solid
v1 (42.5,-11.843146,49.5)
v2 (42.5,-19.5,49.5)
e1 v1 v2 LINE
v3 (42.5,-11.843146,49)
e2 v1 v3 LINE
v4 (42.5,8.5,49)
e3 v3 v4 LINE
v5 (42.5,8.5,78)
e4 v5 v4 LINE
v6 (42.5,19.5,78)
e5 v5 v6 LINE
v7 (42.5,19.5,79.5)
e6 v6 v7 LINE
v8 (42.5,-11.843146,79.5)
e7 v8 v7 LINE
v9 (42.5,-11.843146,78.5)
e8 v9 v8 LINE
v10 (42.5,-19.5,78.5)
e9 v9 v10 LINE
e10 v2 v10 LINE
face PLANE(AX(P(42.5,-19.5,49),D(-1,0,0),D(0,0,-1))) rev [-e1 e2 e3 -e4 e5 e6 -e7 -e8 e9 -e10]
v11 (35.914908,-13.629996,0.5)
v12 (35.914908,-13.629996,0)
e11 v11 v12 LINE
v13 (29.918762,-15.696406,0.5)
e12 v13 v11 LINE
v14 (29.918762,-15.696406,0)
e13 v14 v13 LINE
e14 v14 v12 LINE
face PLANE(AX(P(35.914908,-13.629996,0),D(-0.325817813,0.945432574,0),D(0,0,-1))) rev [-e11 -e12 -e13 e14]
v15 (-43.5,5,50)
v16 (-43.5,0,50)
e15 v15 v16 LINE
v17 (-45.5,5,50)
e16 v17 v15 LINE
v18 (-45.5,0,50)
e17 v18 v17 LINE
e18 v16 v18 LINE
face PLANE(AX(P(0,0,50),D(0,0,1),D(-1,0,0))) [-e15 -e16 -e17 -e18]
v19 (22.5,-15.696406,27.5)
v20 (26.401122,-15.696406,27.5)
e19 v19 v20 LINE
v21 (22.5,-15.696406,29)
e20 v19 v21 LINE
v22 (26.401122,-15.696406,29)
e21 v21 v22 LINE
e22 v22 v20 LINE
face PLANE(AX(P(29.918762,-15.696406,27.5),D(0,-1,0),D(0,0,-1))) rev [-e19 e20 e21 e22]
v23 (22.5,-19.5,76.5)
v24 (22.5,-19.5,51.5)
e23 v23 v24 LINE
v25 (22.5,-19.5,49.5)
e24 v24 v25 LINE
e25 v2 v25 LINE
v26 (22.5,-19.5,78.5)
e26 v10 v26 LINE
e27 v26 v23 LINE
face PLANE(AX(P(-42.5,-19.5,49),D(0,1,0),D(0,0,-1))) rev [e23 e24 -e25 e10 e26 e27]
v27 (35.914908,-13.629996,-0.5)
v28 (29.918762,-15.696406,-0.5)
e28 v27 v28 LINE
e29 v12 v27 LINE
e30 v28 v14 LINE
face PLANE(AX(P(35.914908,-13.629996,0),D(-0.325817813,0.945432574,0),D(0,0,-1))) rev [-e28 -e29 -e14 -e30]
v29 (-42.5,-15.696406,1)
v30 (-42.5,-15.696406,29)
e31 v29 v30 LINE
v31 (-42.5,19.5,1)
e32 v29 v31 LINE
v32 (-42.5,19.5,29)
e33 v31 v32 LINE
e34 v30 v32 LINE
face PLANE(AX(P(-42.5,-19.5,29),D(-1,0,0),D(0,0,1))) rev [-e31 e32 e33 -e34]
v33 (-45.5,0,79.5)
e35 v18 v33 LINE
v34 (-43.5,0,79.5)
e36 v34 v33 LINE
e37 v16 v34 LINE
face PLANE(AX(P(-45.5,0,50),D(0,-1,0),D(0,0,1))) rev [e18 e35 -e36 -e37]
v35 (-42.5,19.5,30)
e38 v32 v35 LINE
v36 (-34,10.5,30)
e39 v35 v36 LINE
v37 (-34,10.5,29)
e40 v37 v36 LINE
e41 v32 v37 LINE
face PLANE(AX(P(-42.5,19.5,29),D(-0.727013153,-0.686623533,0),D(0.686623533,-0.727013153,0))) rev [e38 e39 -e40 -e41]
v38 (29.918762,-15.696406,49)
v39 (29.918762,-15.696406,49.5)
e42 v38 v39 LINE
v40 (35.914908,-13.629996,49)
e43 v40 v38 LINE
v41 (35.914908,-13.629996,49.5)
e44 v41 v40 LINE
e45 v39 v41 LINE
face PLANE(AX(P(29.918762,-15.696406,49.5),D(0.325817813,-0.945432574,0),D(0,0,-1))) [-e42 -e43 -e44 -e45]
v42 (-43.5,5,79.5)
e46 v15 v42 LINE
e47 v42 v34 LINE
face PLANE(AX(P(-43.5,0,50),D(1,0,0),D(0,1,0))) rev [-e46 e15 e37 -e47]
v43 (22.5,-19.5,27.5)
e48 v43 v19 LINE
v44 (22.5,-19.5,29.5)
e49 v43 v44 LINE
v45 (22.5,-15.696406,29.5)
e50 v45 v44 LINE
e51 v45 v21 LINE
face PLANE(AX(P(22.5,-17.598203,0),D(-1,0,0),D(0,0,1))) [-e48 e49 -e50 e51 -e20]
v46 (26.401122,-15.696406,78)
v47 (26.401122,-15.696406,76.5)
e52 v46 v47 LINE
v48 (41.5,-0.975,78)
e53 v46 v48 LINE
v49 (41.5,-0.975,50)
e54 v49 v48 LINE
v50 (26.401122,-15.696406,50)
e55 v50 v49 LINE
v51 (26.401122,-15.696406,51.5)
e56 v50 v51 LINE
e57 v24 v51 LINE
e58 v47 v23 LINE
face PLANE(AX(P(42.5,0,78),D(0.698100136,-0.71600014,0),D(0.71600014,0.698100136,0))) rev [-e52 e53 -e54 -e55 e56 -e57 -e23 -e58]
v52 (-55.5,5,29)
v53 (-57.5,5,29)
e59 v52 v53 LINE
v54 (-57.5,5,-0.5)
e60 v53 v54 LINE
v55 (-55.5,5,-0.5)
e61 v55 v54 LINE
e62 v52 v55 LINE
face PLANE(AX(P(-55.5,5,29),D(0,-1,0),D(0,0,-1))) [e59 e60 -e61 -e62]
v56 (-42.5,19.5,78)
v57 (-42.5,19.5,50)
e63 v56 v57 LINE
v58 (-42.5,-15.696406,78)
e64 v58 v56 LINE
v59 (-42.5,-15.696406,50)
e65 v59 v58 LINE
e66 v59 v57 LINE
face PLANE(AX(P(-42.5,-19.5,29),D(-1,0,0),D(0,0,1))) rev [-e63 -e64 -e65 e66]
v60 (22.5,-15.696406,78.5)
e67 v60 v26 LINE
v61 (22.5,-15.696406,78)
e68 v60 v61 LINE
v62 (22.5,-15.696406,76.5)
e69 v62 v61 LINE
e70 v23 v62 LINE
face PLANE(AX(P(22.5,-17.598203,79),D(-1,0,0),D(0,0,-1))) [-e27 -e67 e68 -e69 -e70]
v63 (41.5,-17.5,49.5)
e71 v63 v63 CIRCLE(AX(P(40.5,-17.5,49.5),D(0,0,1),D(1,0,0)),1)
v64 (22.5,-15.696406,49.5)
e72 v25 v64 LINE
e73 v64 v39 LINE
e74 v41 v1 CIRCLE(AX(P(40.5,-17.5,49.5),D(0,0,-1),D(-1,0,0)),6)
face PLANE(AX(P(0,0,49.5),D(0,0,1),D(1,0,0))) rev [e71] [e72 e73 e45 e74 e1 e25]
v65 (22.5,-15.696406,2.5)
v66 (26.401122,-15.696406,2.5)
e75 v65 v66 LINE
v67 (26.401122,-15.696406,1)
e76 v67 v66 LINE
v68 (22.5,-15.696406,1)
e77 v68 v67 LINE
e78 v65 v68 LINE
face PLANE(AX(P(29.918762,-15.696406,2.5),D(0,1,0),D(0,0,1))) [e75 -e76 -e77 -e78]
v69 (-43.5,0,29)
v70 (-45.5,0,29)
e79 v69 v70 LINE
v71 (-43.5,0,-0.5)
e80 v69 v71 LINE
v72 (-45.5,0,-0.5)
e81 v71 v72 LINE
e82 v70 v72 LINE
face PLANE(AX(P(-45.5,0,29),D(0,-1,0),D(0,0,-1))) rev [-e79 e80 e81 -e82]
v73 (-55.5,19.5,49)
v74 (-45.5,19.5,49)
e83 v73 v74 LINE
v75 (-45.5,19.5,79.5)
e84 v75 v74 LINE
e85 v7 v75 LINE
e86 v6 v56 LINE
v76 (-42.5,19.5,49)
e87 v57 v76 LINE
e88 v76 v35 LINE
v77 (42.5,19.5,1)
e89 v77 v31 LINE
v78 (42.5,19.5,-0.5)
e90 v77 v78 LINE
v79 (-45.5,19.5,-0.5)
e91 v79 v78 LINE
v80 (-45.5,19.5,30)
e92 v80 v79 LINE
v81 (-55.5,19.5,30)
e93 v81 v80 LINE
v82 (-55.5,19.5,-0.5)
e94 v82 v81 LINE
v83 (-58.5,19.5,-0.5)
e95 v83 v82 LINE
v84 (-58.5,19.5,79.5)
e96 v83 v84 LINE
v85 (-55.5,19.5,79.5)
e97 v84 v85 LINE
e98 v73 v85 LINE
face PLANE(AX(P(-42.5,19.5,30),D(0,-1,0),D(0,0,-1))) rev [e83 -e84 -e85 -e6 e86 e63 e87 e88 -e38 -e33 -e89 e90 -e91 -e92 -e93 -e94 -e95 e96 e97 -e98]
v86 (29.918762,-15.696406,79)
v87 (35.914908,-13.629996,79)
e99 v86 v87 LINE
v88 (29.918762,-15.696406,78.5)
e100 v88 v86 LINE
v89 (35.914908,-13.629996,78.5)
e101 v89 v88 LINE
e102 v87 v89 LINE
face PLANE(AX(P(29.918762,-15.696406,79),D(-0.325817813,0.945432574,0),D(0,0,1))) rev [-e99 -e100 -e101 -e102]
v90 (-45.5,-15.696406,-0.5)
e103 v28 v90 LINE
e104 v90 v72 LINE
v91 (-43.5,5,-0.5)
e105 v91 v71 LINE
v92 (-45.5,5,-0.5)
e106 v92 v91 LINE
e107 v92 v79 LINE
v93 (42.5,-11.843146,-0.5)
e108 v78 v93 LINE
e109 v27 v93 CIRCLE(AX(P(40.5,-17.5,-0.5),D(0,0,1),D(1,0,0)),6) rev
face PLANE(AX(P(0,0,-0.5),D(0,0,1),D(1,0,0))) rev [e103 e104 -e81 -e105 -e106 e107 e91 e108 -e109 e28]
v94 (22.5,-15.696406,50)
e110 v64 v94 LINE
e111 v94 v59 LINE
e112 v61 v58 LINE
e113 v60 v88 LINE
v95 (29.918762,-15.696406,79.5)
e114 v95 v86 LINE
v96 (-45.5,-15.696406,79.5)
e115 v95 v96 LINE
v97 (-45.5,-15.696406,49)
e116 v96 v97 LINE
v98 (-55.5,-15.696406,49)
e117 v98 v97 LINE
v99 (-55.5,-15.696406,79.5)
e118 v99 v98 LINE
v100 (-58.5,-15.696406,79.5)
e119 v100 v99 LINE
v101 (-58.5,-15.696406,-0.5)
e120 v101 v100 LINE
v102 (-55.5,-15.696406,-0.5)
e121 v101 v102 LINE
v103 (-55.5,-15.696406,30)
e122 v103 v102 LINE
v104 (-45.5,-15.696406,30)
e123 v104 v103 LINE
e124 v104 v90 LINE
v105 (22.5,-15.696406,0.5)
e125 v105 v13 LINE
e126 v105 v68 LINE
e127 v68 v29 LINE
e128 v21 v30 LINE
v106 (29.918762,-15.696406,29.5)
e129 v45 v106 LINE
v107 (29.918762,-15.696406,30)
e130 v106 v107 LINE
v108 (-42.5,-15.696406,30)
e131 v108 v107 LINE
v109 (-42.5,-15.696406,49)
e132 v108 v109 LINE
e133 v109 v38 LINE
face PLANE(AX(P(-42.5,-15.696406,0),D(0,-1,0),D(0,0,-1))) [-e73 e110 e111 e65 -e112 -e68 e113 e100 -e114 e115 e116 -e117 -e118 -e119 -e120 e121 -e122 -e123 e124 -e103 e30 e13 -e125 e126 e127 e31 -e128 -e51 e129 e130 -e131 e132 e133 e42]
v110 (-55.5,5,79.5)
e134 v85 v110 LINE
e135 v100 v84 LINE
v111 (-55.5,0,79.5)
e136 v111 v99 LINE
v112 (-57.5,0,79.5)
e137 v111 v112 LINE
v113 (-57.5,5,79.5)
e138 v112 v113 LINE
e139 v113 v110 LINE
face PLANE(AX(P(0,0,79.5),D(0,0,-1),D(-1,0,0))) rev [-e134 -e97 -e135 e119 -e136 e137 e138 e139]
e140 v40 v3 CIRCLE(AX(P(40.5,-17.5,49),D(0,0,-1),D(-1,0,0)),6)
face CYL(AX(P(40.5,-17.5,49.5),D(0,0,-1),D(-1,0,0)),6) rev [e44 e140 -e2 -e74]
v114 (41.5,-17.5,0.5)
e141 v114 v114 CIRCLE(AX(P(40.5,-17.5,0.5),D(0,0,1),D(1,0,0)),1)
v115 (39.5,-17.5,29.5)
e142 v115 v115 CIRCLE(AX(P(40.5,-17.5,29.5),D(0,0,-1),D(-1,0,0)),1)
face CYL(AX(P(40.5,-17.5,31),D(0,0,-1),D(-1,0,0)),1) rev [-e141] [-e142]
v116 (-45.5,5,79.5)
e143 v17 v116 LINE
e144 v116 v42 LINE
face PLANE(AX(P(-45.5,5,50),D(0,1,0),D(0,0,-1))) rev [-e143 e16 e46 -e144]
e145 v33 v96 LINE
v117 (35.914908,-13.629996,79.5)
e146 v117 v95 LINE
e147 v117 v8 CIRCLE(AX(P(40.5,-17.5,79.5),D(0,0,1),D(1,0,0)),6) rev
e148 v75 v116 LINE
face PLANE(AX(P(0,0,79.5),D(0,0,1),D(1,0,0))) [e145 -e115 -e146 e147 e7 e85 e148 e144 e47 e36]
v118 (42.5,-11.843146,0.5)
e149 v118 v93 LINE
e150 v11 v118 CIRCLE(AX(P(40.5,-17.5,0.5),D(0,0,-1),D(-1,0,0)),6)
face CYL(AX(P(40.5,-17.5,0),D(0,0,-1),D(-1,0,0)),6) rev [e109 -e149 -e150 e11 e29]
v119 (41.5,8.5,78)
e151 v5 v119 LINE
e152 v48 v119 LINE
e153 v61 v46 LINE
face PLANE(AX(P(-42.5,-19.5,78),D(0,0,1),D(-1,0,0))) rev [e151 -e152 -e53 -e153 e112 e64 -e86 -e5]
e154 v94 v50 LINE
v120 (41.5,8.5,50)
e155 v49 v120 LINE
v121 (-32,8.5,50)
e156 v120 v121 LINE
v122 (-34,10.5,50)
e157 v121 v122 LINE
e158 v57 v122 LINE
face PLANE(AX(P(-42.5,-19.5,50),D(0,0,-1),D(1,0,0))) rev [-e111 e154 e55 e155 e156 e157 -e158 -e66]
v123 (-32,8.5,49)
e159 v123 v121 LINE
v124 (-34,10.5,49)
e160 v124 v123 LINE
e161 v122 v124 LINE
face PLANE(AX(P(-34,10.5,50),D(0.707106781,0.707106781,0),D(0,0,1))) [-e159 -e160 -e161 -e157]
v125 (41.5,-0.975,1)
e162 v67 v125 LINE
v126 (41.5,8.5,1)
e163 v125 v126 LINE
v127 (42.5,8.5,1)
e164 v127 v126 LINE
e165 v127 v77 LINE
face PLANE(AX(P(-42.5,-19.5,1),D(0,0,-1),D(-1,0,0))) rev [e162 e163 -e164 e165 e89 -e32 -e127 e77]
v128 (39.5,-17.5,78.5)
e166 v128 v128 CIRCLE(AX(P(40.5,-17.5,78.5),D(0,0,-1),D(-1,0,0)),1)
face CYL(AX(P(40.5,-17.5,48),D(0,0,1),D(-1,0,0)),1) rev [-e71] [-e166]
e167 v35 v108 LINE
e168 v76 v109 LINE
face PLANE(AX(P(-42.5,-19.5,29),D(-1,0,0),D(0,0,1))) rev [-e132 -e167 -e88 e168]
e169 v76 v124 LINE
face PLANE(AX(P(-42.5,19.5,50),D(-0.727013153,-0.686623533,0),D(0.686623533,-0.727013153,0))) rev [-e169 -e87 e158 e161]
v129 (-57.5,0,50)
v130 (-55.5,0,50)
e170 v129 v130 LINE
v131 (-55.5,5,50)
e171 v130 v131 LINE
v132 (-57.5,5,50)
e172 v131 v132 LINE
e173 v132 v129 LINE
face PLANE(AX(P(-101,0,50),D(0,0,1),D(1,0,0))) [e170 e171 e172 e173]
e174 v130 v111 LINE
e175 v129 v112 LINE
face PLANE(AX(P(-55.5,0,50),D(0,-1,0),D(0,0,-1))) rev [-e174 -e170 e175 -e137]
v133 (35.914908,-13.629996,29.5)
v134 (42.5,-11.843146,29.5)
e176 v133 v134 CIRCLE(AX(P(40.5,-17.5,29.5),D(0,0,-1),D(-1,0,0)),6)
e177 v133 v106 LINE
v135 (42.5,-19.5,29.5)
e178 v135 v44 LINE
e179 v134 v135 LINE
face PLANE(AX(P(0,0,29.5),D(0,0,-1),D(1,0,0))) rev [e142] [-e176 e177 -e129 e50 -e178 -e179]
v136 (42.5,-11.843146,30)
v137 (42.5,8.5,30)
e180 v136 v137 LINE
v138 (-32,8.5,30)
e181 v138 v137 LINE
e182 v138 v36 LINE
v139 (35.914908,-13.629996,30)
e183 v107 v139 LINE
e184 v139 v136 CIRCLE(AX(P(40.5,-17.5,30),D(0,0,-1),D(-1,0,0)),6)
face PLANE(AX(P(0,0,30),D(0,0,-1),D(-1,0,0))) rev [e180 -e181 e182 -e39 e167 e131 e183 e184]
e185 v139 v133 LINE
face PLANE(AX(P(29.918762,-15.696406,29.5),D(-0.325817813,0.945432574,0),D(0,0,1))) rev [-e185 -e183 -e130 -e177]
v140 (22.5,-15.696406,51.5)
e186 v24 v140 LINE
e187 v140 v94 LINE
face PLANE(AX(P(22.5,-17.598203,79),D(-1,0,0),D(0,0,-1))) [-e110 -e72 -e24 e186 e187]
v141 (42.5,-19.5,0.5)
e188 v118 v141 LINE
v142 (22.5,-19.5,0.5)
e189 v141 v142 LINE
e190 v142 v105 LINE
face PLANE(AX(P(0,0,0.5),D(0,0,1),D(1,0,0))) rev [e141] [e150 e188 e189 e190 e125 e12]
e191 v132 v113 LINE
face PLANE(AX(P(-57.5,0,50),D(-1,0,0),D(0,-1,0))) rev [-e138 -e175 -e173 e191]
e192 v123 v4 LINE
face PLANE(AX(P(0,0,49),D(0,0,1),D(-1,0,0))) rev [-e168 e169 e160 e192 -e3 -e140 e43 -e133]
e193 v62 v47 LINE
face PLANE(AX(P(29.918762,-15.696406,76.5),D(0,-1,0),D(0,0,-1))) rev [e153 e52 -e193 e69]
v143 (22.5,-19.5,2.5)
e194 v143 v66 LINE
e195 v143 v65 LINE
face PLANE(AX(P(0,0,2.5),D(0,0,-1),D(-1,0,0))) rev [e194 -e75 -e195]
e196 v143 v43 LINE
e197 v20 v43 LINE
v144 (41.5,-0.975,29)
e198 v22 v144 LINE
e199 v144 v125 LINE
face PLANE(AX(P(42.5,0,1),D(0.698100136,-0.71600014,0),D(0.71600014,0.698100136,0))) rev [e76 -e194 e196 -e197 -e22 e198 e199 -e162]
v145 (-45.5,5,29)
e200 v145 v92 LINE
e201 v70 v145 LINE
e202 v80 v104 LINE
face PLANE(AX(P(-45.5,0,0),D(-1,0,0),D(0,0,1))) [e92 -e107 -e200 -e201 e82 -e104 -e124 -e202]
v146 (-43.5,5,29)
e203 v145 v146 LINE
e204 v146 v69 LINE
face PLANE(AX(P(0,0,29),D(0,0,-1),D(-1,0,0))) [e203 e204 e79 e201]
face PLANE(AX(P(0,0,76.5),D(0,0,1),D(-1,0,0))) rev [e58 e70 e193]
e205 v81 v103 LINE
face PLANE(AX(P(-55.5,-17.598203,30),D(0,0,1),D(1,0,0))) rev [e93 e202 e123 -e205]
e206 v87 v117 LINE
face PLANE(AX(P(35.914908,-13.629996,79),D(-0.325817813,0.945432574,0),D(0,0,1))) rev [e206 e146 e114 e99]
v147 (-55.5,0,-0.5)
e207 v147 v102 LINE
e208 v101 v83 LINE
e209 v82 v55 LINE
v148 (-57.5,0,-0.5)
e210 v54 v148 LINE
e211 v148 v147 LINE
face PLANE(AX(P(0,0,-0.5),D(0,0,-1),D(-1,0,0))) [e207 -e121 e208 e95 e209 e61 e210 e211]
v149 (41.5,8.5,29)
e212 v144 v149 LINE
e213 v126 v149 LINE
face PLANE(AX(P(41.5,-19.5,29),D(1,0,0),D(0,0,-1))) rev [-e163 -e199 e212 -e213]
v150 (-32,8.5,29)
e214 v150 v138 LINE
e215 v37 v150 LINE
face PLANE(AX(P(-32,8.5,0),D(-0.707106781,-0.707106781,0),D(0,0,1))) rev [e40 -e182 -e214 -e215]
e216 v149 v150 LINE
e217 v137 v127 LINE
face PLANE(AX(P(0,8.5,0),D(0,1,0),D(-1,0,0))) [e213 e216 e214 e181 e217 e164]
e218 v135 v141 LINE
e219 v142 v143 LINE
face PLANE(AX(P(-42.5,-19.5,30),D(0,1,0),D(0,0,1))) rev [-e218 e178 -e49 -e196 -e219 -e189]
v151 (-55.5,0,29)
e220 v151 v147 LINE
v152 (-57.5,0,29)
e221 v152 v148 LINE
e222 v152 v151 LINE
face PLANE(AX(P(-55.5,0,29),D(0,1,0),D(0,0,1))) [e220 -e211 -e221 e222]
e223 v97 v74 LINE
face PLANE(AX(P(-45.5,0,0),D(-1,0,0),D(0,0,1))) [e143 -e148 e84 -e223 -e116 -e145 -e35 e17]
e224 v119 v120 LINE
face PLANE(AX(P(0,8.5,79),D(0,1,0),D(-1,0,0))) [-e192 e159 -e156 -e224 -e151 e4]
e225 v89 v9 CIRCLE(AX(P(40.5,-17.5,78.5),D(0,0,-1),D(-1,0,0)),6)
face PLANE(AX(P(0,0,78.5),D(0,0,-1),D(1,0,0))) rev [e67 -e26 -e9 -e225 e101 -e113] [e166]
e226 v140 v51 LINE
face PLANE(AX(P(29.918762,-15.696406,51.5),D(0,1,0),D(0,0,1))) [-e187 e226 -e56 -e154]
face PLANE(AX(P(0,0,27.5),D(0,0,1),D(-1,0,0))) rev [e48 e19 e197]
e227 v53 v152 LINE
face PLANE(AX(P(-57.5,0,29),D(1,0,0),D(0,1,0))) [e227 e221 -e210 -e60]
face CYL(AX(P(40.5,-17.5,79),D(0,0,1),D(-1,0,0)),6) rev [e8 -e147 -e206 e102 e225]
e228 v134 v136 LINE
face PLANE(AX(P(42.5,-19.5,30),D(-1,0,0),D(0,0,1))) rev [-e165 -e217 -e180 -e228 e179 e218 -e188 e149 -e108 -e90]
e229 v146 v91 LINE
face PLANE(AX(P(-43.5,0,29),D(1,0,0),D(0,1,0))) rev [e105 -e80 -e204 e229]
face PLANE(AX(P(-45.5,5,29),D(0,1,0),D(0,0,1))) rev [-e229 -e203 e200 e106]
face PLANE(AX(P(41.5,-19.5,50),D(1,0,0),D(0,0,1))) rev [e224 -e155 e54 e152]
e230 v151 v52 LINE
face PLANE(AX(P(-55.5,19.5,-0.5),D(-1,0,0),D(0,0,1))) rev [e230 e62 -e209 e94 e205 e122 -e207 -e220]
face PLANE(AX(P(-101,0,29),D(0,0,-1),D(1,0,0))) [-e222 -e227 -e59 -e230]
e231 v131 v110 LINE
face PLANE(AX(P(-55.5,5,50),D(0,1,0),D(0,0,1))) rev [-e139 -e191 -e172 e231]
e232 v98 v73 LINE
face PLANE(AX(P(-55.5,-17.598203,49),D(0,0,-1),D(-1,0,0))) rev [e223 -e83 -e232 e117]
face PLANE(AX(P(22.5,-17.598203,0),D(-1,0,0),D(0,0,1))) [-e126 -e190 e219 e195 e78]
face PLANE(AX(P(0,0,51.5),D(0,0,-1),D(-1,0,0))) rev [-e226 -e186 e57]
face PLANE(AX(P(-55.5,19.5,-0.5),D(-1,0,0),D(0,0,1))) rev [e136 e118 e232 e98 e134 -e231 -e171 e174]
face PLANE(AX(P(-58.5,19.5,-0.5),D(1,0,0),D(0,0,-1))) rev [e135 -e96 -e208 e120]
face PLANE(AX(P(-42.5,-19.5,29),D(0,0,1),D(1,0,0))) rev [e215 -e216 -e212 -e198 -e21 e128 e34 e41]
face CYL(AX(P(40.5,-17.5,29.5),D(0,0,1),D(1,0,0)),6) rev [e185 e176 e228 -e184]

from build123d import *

# Parameters (mm, degrees)
SKETCH4_W                 = 85
SKETCH4_H                 = 39
BOSS_EXTRUDE2_DEPTH       = 30
BOSS_EXTRUDE3_DEPTH       = 39
SKETCH7_W                 = 84
SKETCH7_H                 = 28
CUT_EXTRUDE1_DEPTH        = 39
CUT_EXTRUDE2_DEPTH        = 1
SKETCH9_W                 = 1
SKETCH9_H                 = 9
CUT_EXTRUDE4_DEPTH        = 28
SKETCH19_W                = 31
SKETCH19_H                = 39
BOSS_EXTRUDE4_DEPTH       = 2
SKETCH20_W                = 3
SKETCH20_H                = 39
BOSS_EXTRUDE5_DEPTH       = 9
SKETCH38_W                = 1
SKETCH38_H                = 29
BOSS_EXTRUDE6_DEPTH       = 9
SKETCH39_W                = 1
SKETCH39_H                = 39
BOSS_EXTRUDE7_DEPTH       = 47.410129
BOSS_EXTRUDE8_DEPTH       = 28
SKETCH42_W                = 2
SKETCH42_H                = 5
CUT_EXTRUDE5_DEPTH        = 30
BOSS_EXTRUDE9_DEPTH       = 1
SKETCH44_R                = 1
CUT_EXTRUDE7_DEPTH        = 32
SKETCH46_W                = 85
SKETCH46_H                = 3.803593904
CUT_EXTRUDE8_DEPTH        = 1
CUT_EXTRUDE9_START        = -1
SKETCH48_W                = 65
SKETCH48_H                = 1.901796952
CUT_EXTRUDE9_DEPTH        = 30
SKETCH49_R                = 6
CUT_EXTRUDE10_DEPTH       = 1
CUT_EXTRUDE11_START       = -3
SKETCH50_W                = 31
SKETCH50_H                = 1.901796952
CUT_EXTRUDE11_DEPTH       = 3
SKETCH52_W                = 3
SKETCH52_H                = 39
BOSS_EXTRUDE10_DEPTH      = 0.5
CUT_EXTRUDE13_START       = -85
SKETCH56_W                = 1
SKETCH56_H                = 35.196406096
CUT_EXTRUDE13_DEPTH       = 85
SKETCH58_W                = 88
SKETCH58_H                = 39
CUT_EXTRUDE14_DEPTH       = 0.5
SKETCH59_W                = 88
SKETCH59_H                = 39
CUT_EXTRUDE15_DEPTH       = 0.5
SKETCH60_W                = 19
SKETCH60_H                = 37.098203048
BOSS_EXTRUDE11_DEPTH      = 10
BOSS_EXTRUDE12_DEPTH      = 30.5
BOSS_EXTRUDE12_DEPTH_BACK = 49.5
SKETCH61_W                = 3
SKETCH61_H                = 37.098203048
MIRROR13_COPY_1_SKETCH_W  = 2
MIRROR13_COPY_1_SKETCH_H  = 5
MIRROR13_COPY_1_DEPTH     = 30
MIRROR13_COPY_2_SKETCH_W  = 2
MIRROR13_COPY_2_SKETCH_H  = 5
MIRROR13_COPY_2_DEPTH     = 30
SKETCH63_W                = 85
SKETCH63_H                = 3.803593904
CUT_EXTRUDE16_DEPTH       = 0.5
MIRROR15_COPY_1_SKETCH_W  = 85
MIRROR15_COPY_1_SKETCH_H  = 3.803593904
MIRROR15_COPY_1_DEPTH     = 0.5
SKETCH66_R                = 6
CUT_EXTRUDE17_DEPTH       = 0.5
MIRROR17_COPY_1_SKETCH_R  = 6
MIRROR17_COPY_1_DEPTH     = 0.5
CHAMFER3_START            = 24.587959213
CHAMFER3_OUTLINE_W        = 9
CHAMFER3_OUTLINE_H        = 0.5
CHAMFER3_DEPTH            = 7.695233043
SKETCH67_W                = 3
SKETCH67_H                = 19
CUT_EXTRUDE18_DEPTH       = 1.901797
SKETCH72_W                = 65
SKETCH72_H                = 0.5
CUT_EXTRUDE21_DEPTH       = 1.901797
MIRROR20_COPY_1_SKETCH_W  = 65
MIRROR20_COPY_1_SKETCH_H  = 0.5
MIRROR20_COPY_1_DEPTH     = 1.901797
SKETCH74_W                = 7.418761949
SKETCH74_H                = 3.803593904
BOSS_EXTRUDE13_DEPTH      = 2
MIRROR22_COPY_1_SKETCH_W  = 7.418761949
MIRROR22_COPY_1_SKETCH_H  = 3.803593904
MIRROR22_COPY_1_DEPTH     = 2
CUT_EXTRUDE31_START       = -16
SKETCH79_W                = 80
SKETCH79_H                = 1.901796952
CUT_EXTRUDE31_DEPTH       = 16
SKETCH81_W                = 94
SKETCH81_H                = 1
CUT_EXTRUDE33_DEPTH       = 2
CUT_EXTRUDE34_START       = -11
SKETCH80_W                = 1
SKETCH80_H                = 29
CUT_EXTRUDE34_DEPTH       = 11
CHAMFER5_SIZE             = 2
CHAMFER5_OF_MIRROR23_SIZE = 2


with BuildPart() as part:
    # Sketch4 → Boss-Extrude2 (new body)
    with BuildSketch(Plane.XY):
        Rectangle(SKETCH4_W, SKETCH4_H)
    extrude(amount=BOSS_EXTRUDE2_DEPTH)

    # Sketch6 → Boss-Extrude3 (add)
    with BuildSketch(Plane(origin=(0, 19.5, 0), x_dir=(1, 0, 0), z_dir=(0, 1, 0))):
        Polygon((-4.910129242, 0), (-4.910129242, 1), (-43.5, 1), (-43.5, -30), (-42.5, -30), (-42.5, 0), align=None)
    extrude(amount=-BOSS_EXTRUDE3_DEPTH)

    # Sketch7 → Cut-Extrude1 (cut)
    with BuildSketch(Plane(origin=(0, 19.5, 0), x_dir=(1, 0, 0), z_dir=(0, 1, 0))):
        with Locations((-0.5, -15)):
            Rectangle(SKETCH7_W, SKETCH7_H)
    extrude(amount=-CUT_EXTRUDE1_DEPTH, mode=Mode.SUBTRACT)

    # Angled cut → Cut-Extrude2 (cut)
    with BuildSketch(Plane.XY.offset(30)):
        Polygon((12.07, 10.5), (42.5, 10.5), (42.5, 19.5), (-42.5, 19.5), (-34, 10.5), align=None)
    extrude(amount=-CUT_EXTRUDE2_DEPTH, mode=Mode.SUBTRACT)

    # Sketch9 → Cut-Extrude4 (cut)
    with BuildSketch(Plane.XY.offset(29)):
        with Locations((42, 15)):
            Rectangle(SKETCH9_W, SKETCH9_H)
    extrude(amount=-CUT_EXTRUDE4_DEPTH, mode=Mode.SUBTRACT)

    # Sketch19 → Boss-Extrude4 (add)
    with BuildSketch(Plane.ZY.offset(43.5)):
        with Locations((14.5, 0)):
            Rectangle(SKETCH19_W, SKETCH19_H)
    extrude(amount=BOSS_EXTRUDE4_DEPTH)

    # Sketch20 → Boss-Extrude5 (add)
    with BuildSketch(Plane.XY.offset(30)):
        with Locations((-44, 0)):
            Rectangle(SKETCH20_W, SKETCH20_H)
    extrude(amount=BOSS_EXTRUDE5_DEPTH)

    # Sketch38 → Boss-Extrude6 (add)
    with BuildSketch(Plane(origin=(0, 10.5, 0), x_dir=(1, 0, 0), z_dir=(0, 1, 0))):
        with Locations((42, -15.5)):
            Rectangle(SKETCH38_W, SKETCH38_H)
    extrude(amount=BOSS_EXTRUDE6_DEPTH)

    # Sketch39 → Boss-Extrude7 (add)
    with BuildSketch(Plane(origin=(-4.910129242, 0, 0), x_dir=(0, 0, -1), z_dir=(1, 0, 0))):
        with Locations((0.5, 0)):
            Rectangle(SKETCH39_W, SKETCH39_H)
    extrude(amount=BOSS_EXTRUDE7_DEPTH)

    # Sketch40 → Boss-Extrude8 (add)
    with BuildSketch(Plane(origin=(0, 0, 29), x_dir=(-1, 0, 0), z_dir=(0, 0, -1))):
        Polygon((-42.5, -19.5), (-42.5, 0), (-22.5, -19.5), align=None)
    extrude(amount=BOSS_EXTRUDE8_DEPTH)

    # Sketch42 → Cut-Extrude5 (cut)
    with BuildSketch(Plane(origin=(0, 0, -1), x_dir=(-1, 0, 0), z_dir=(0, 0, -1))):
        with Locations((44.5, 2.5)):
            Rectangle(SKETCH42_W, SKETCH42_H)
    cut_extrude5 = extrude(amount=-CUT_EXTRUDE5_DEPTH, mode=Mode.SUBTRACT)

    # Sketch45 → Boss-Extrude9 (add)
    with BuildSketch(Plane.XY.offset(30)):
        Polygon((-42.5, 19.5), (-42.5, -19.5), (42.5, -19.5), (42.5, 19.5), (41.5, 19.5), (41.5, 10.5), (-34, 10.5), align=None)
    extrude(amount=BOSS_EXTRUDE9_DEPTH)

    # Sketch44 → Cut-Extrude7 (cut)
    with BuildSketch(Plane.XY.offset(-1)):
        with Locations((40.5, -17.5)):
            Circle(SKETCH44_R)
    extrude(amount=CUT_EXTRUDE7_DEPTH, mode=Mode.SUBTRACT)

    # Sketch46 → Cut-Extrude8 (cut)
    with BuildSketch(Plane.XY.offset(31)):
        with Locations((0, -17.598203048)):
            Rectangle(SKETCH46_W, SKETCH46_H)
    cut_extrude8 = extrude(amount=-CUT_EXTRUDE8_DEPTH, mode=Mode.SUBTRACT)

    # Mirror1: Cut-Extrude8 across plane
    add(cut_extrude8.mirror(Plane.XY.offset(15)), mode=Mode.SUBTRACT)

    # Sketch48 → Cut-Extrude9 (cut)
    with BuildSketch(Plane(origin=(0, 0, 29), x_dir=(-1, 0, 0), z_dir=(0, 0, -1)).offset(CUT_EXTRUDE9_START)):
        with Locations((10, -18.549101524)):
            Rectangle(SKETCH48_W, SKETCH48_H)
    extrude(amount=CUT_EXTRUDE9_DEPTH, mode=Mode.SUBTRACT)

    # Sketch49 → Cut-Extrude10 (cut)
    with BuildSketch(Plane(origin=(0, 0, -1), x_dir=(-1, 0, 0), z_dir=(0, 0, -1))):
        with Locations((-40.5, -17.5)):
            Circle(SKETCH49_R)
    cut_extrude10 = extrude(amount=-CUT_EXTRUDE10_DEPTH, mode=Mode.SUBTRACT)

    # Chamfer1
    # the kernel refuses this chamfer: 5.980598359, 5 mm, written as the material it takes off along each edge
    with BuildSketch(Plane(origin=(34.777496262, -15.696406096, 0), x_dir=(0.4822071205961933, 0.8760572429050103, 0), z_dir=(0, 0, -1))) as chamfer1_piece_1:
        with BuildLine():
            Line((2.536104825, 0.160553083), (-2.520260012, -4.417082469))
            Line((-2.520260012, -4.417082469), (-2.625046943, -4.359404727))
            ThreePointArc((-2.625046943, -4.359404727), (-1.330775488, -2.169655928), (-0.10478693, 0.057677742))
            Line((-0.10478693, 0.057677742), (0.023511338, 0.117278471))
            ThreePointArc((0.023511338, 0.117278471), (1.269229547, 0.003245098), (2.512593487, 0.277831553))
            Line((2.512593487, 0.277831553), (2.536104825, 0.160553083))
        make_face()
    extrude(amount=13.71375438, mode=Mode.SUBTRACT)

    # Mirror5: Cut-Extrude10 across plane
    add(cut_extrude10.mirror(Plane.XY.offset(15)), mode=Mode.SUBTRACT)

    # Chamfer2
    # the kernel refuses this chamfer: 5, 3.700015876 mm, written as the material it takes off along each edge
    with BuildSketch(Plane(origin=(34.777496262, -15.696406096, 30), x_dir=(-1, 0, 0), z_dir=(0, 0, 1))) as chamfer2_piece_1:
        with BuildLine():
            Line((4.531412713, 0.062382614), (-1.046280636, -1.768725655))
            Line((-1.046280636, -1.768725655), (-1.127384723, -1.710226706))
            ThreePointArc((-1.127384723, -1.710226706), (-0.481456561, -0.905912415), (-0.095375062, 0.030059898))
            Line((-0.095375062, 0.030059898), (0, 0.1))
            ThreePointArc((0, 0.1), (2.265706356, 0.1), (4.531412713, 0.162382614))
            Line((4.531412713, 0.162382614), (4.531412713, 0.062382614))
        make_face()
    extrude(amount=12.329605235, mode=Mode.SUBTRACT)

    # Sketch50 → Cut-Extrude11 (cut)
    with BuildSketch(Plane(origin=(-42.5, 0, 0), x_dir=(0, 0, -1), z_dir=(1, 0, 0)).offset(CUT_EXTRUDE11_START)):
        with Locations((-14.5, -18.549101524)):
            Rectangle(SKETCH50_W, SKETCH50_H)
    extrude(amount=CUT_EXTRUDE11_DEPTH, mode=Mode.SUBTRACT)

    # Sketch52 → Boss-Extrude10 (add)
    with BuildSketch(Plane.XY.offset(39)):
        with Locations((-44, 0)):
            Rectangle(SKETCH52_W, SKETCH52_H)
    extrude(amount=BOSS_EXTRUDE10_DEPTH)

    # Mirror8: part across plane


with BuildPart() as part_1:
    add(part.part)
    add(part.part.mirror(Plane.XY.offset(39.5)))

    # Sketch56 → Cut-Extrude13 (cut)
    with BuildSketch(Plane(origin=(42.5, 0, 0), x_dir=(0, 0, -1), z_dir=(1, 0, 0)).offset(CUT_EXTRUDE13_START)):
        with Locations((-30.5, 1.901796952)):
            Rectangle(SKETCH56_W, SKETCH56_H)
    cut_extrude13 = extrude(amount=CUT_EXTRUDE13_DEPTH, mode=Mode.SUBTRACT)

    # Mirror11: Cut-Extrude13 across plane
    add(cut_extrude13.mirror(Plane.XY.offset(39.5)), mode=Mode.SUBTRACT)

    # Sketch58 → Cut-Extrude14 (cut)
    with BuildSketch(Plane(origin=(0, 0, -1), x_dir=(-1, 0, 0), z_dir=(0, 0, -1))):
        with Locations((1.5, 0)):
            Rectangle(SKETCH58_W, SKETCH58_H)
    extrude(amount=-CUT_EXTRUDE14_DEPTH, mode=Mode.SUBTRACT)

    # Sketch59 → Cut-Extrude15 (cut)
    with BuildSketch(Plane.XY.offset(80)):
        with Locations((-1.5, 0)):
            Rectangle(SKETCH59_W, SKETCH59_H)
    extrude(amount=-CUT_EXTRUDE15_DEPTH, mode=Mode.SUBTRACT)

    # Sketch60 → Boss-Extrude11 (add)
    with BuildSketch(Plane.ZY.offset(45.5)):
        with Locations((39.5, 0.950898476)):
            Rectangle(SKETCH60_W, SKETCH60_H)
    extrude(amount=BOSS_EXTRUDE11_DEPTH)

    # Sketch61 → Boss-Extrude12 (add, two sides: drawn at the far end of the back side and taken through both)
    with BuildSketch(Plane(origin=(0, 0, 30), x_dir=(-1, 0, 0), z_dir=(0, 0, -1)).offset(-BOSS_EXTRUDE12_DEPTH_BACK)):
        with Locations((57, 0.950898476)):
            Rectangle(SKETCH61_W, SKETCH61_H)
    extrude(amount=BOSS_EXTRUDE12_DEPTH + BOSS_EXTRUDE12_DEPTH_BACK)

    # Mirror12: Cut-Extrude5 across plane
    add(cut_extrude5.mirror(Plane.ZY.offset(50.5)), mode=Mode.SUBTRACT)

    # Mirror13 copy 1 sketch → Mirror13 copy 1 (cut)
    with BuildSketch(Plane(origin=(-101, 0, 80), x_dir=(1, 0, 0), z_dir=(0, 0, 1))):
        with Locations((44.5, 2.5)):
            Rectangle(MIRROR13_COPY_1_SKETCH_W, MIRROR13_COPY_1_SKETCH_H)
    extrude(amount=-MIRROR13_COPY_1_DEPTH, mode=Mode.SUBTRACT)

    # Mirror13 copy 2 sketch → Mirror13 copy 2 (cut)
    with BuildSketch(Plane(origin=(0, 0, 80), x_dir=(-1, 0, 0), z_dir=(0, 0, 1))):
        with Locations((44.5, -2.5)):
            Rectangle(MIRROR13_COPY_2_SKETCH_W, MIRROR13_COPY_2_SKETCH_H)
    extrude(amount=-MIRROR13_COPY_2_DEPTH, mode=Mode.SUBTRACT)

    # Sketch63 → Cut-Extrude16 (cut)
    with BuildSketch(Plane(origin=(0, 0, 0), x_dir=(-1, 0, 0), z_dir=(0, 0, -1))):
        with Locations((0, -17.598203048)):
            Rectangle(SKETCH63_W, SKETCH63_H)
    cut_extrude16 = extrude(amount=-CUT_EXTRUDE16_DEPTH, mode=Mode.SUBTRACT)

    # Mirror14: Cut-Extrude16 across plane
    add(cut_extrude16.mirror(Plane.XY.offset(15)), mode=Mode.SUBTRACT)

    # Mirror15: Cut-Extrude16 across plane
    add(cut_extrude16.mirror(Plane.XY.offset(39.5)), mode=Mode.SUBTRACT)

    # Mirror15 copy 1 sketch → Mirror15 copy 1 (cut)
    with BuildSketch(Plane(origin=(0, 0, 49), x_dir=(-1, 0, 0), z_dir=(0, 0, -1))):
        with Locations((0, -17.598203048)):
            Rectangle(MIRROR15_COPY_1_SKETCH_W, MIRROR15_COPY_1_SKETCH_H)
    extrude(amount=-MIRROR15_COPY_1_DEPTH, mode=Mode.SUBTRACT)

    # Sketch66 → Cut-Extrude17 (cut)
    with BuildSketch(Plane(origin=(0, 0, 0), x_dir=(-1, 0, 0), z_dir=(0, 0, -1))):
        with Locations((-40.5, -17.5)):
            Circle(SKETCH66_R)
    cut_extrude17 = extrude(amount=-CUT_EXTRUDE17_DEPTH, mode=Mode.SUBTRACT)

    # Mirror16: Cut-Extrude17 across plane
    add(cut_extrude17.mirror(Plane.XY.offset(15)), mode=Mode.SUBTRACT)

    # Mirror17: Cut-Extrude17 across plane
    add(cut_extrude17.mirror(Plane.XY.offset(39.5)), mode=Mode.SUBTRACT)

    # Mirror17 copy 1 sketch → Mirror17 copy 1 (cut)
    with BuildSketch(Plane(origin=(0, 0, 49), x_dir=(-1, 0, 0), z_dir=(0, 0, -1))):
        with Locations((-40.5, -17.5)):
            Circle(MIRROR17_COPY_1_SKETCH_R)
    extrude(amount=-MIRROR17_COPY_1_DEPTH, mode=Mode.SUBTRACT)

    # Chamfer3: read off the stored shape, not the designer's step
    # Chamfer3 outline → Chamfer3 (cut)
    with BuildSketch(Plane(origin=(0, 0, 0), x_dir=(0.9454325743674387, 0.32581781308724894, 0), z_dir=(0.32581781308724894, -0.9454325743674388, 0)).offset(CHAMFER3_START)):
        with Locations((26.5, 0.25)):
            Rectangle(CHAMFER3_OUTLINE_W, CHAMFER3_OUTLINE_H)
    extrude(amount=CHAMFER3_DEPTH, mode=Mode.SUBTRACT)

    # Chamfer4
    # the kernel refuses this chamfer: 5.980598359, 5, 4.195498156 mm, written as the material it takes off along each edge
    with BuildSketch(Plane(origin=(34.777496262, -15.696406096, 29.5), x_dir=(0.48220712059619303, 0.8760572429050105, 0), z_dir=(0, 0, 1))) as chamfer4_piece_1:
        with BuildLine():
            Line((2.536104825, -0.160553083), (-2.520260012, 4.417082469))
            Line((-2.520260012, 4.417082469), (-2.625046943, 4.359404727))
            ThreePointArc((-2.625046943, 4.359404727), (-1.330775488, 2.169655928), (-0.10478693, -0.057677742))
            Line((-0.10478693, -0.057677742), (0.023511338, -0.117278471))
            ThreePointArc((0.023511338, -0.117278471), (1.269229547, -0.003245098), (2.512593487, -0.277831553))
            Line((2.512593487, -0.277831553), (2.536104825, -0.160553083))
        make_face()
    extrude(amount=13.21375438, mode=Mode.SUBTRACT)
    with BuildSketch(Plane(origin=(34.777496262, -15.696406096, 78.5), x_dir=(-1, 0, 0), z_dir=(0, 0, 1))) as chamfer4_piece_2:
        with BuildLine():
            Line((5.084904413, 0.077943419), (-1.363581496, -2.144353161))
            Line((-1.363581496, -2.144353161), (-1.454986815, -2.067203369))
            ThreePointArc((-1.454986815, -2.067203369), (-0.614874417, -1.110352928), (-0.114079988, 0.035955236))
            Line((-0.114079988, 0.035955236), (0, 0.119611967))
            ThreePointArc((0, 0.119611967), (2.542452207, 0.119611967), (5.084904413, 0.197555386))
            Line((5.084904413, 0.197555386), (5.084904413, 0.077943419))
        make_face()
    extrude(amount=13.21375438, mode=Mode.SUBTRACT)
    with BuildSketch(Plane(origin=(34.777496262, -15.696406096, 49.5), x_dir=(0.48220712059619303, 0.8760572429050105, 0), z_dir=(0, 0, -1))) as chamfer4_piece_3:
        with BuildLine():
            Line((2.536104825, 0.160553083), (-2.520260012, -4.417082469))
            Line((-2.520260012, -4.417082469), (-2.625046943, -4.359404727))
            ThreePointArc((-2.625046943, -4.359404727), (-1.330775488, -2.169655928), (-0.10478693, 0.057677742))
            Line((-0.10478693, 0.057677742), (0.023511338, 0.117278471))
            ThreePointArc((0.023511338, 0.117278471), (1.269229547, 0.003245098), (2.512593487, 0.277831553))
            Line((2.512593487, 0.277831553), (2.536104825, 0.160553083))
        make_face()
    extrude(amount=13.21375438, mode=Mode.SUBTRACT)

    # Sketch67 → Cut-Extrude18 (cut)
    with BuildSketch(Plane.XZ.offset(19.5)):
        with Locations((-44, 39.5)):
            Rectangle(SKETCH67_W, SKETCH67_H)
    extrude(amount=-CUT_EXTRUDE18_DEPTH, mode=Mode.SUBTRACT)

    # Sketch72 → Cut-Extrude21 (cut)
    with BuildSketch(Plane.XZ.offset(17.598203048)):
        with Locations((-10, 0.75)):
            Rectangle(SKETCH72_W, SKETCH72_H)
    cut_extrude21 = extrude(amount=-CUT_EXTRUDE21_DEPTH, mode=Mode.SUBTRACT)

    # Mirror19: Cut-Extrude21 across plane
    add(cut_extrude21.mirror(Plane.XY.offset(15)), mode=Mode.SUBTRACT)

    # Mirror20: Cut-Extrude21 across plane
    add(cut_extrude21.mirror(Plane.XY.offset(39.5)), mode=Mode.SUBTRACT)

    # Mirror20 copy 1 sketch → Mirror20 copy 1 (cut)
    with BuildSketch(Plane(origin=(0, -17.598203048, 49), x_dir=(1, 0, 0), z_dir=(0, -1, 0))):
        with Locations((-10, 0.75)):
            Rectangle(MIRROR20_COPY_1_SKETCH_W, MIRROR20_COPY_1_SKETCH_H)
    extrude(amount=-MIRROR20_COPY_1_DEPTH, mode=Mode.SUBTRACT)

    # Sketch74 → Boss-Extrude13 (add)
    with BuildSketch(Plane(origin=(0, 0, 0.5), x_dir=(-1, 0, 0), z_dir=(0, 0, -1))):
        with Locations((-26.209380975, -17.598203048)):
            Rectangle(SKETCH74_W, SKETCH74_H)
    boss_extrude13 = extrude(amount=-BOSS_EXTRUDE13_DEPTH)

    # Mirror21: Boss-Extrude13 across plane
    add(boss_extrude13.mirror(Plane.XY.offset(15)))

    # Mirror22: Boss-Extrude13 across plane
    add(boss_extrude13.mirror(Plane.XY.offset(39.5)))

    # Mirror22 copy 1 sketch → Mirror22 copy 1 (add)
    with BuildSketch(Plane(origin=(0, 0, 49.5), x_dir=(-1, 0, 0), z_dir=(0, 0, -1))):
        with Locations((-26.209380975, -17.598203048)):
            Rectangle(MIRROR22_COPY_1_SKETCH_W, MIRROR22_COPY_1_SKETCH_H)
    extrude(amount=-MIRROR22_COPY_1_DEPTH)

    # Sketch79 → Cut-Extrude31 (cut)
    with BuildSketch(Plane(origin=(-42.5, 0, 0), x_dir=(0, 0, -1), z_dir=(1, 0, 0)).offset(CUT_EXTRUDE31_START)):
        with Locations((-39.5, -16.647304572)):
            Rectangle(SKETCH79_W, SKETCH79_H)
    cut_extrude31 = extrude(amount=CUT_EXTRUDE31_DEPTH, mode=Mode.SUBTRACT)

    # Sketch81 → Cut-Extrude33 (cut)
    with BuildSketch(Plane(origin=(0, 10.5, 0), x_dir=(1, 0, 0), z_dir=(0, 1, 0))):
        with Locations((13, -29.5)):
            Rectangle(SKETCH81_W, SKETCH81_H)
    cut_extrude33 = extrude(amount=-CUT_EXTRUDE33_DEPTH, mode=Mode.SUBTRACT)

    # Sketch80 → Cut-Extrude34 (cut)
    with BuildSketch(Plane(origin=(0, 19.5, 0), x_dir=(1, 0, 0), z_dir=(0, 1, 0)).offset(CUT_EXTRUDE34_START)):
        with Locations((42, -15.5)):
            Rectangle(SKETCH80_W, SKETCH80_H)
    cut_extrude34 = extrude(amount=CUT_EXTRUDE34_DEPTH, mode=Mode.SUBTRACT)

    # Chamfer5
    chamfer5_edges = [part_1.edges().sort_by_distance(p)[0] for p in [
        (-34, 8.5, 29.5),
    ]]
    chamfer(chamfer5_edges, length=CHAMFER5_SIZE - 0.0001)  # a hair under: the kernel refuses the full size

    # Mirror23: Cut-Extrude31, Cut-Extrude33, Cut-Extrude34 across plane
    add(cut_extrude31.mirror(Plane.XY.offset(39.5)), mode=Mode.SUBTRACT)
    add(cut_extrude33.mirror(Plane.XY.offset(39.5)), mode=Mode.SUBTRACT)
    add(cut_extrude34.mirror(Plane.XY.offset(39.5)), mode=Mode.SUBTRACT)

    # Chamfer5 of Mirror23
    chamfer5_of_mirror23_edges = [part_1.edges().sort_by_distance(p)[0] for p in [
        (-34, 8.5, 49.5),
    ]]
    chamfer(chamfer5_of_mirror23_edges, length=CHAMFER5_OF_MIRROR23_SIZE - 0.0001)  # a hair under: the kernel refuses the full size


solid = part_1.part
